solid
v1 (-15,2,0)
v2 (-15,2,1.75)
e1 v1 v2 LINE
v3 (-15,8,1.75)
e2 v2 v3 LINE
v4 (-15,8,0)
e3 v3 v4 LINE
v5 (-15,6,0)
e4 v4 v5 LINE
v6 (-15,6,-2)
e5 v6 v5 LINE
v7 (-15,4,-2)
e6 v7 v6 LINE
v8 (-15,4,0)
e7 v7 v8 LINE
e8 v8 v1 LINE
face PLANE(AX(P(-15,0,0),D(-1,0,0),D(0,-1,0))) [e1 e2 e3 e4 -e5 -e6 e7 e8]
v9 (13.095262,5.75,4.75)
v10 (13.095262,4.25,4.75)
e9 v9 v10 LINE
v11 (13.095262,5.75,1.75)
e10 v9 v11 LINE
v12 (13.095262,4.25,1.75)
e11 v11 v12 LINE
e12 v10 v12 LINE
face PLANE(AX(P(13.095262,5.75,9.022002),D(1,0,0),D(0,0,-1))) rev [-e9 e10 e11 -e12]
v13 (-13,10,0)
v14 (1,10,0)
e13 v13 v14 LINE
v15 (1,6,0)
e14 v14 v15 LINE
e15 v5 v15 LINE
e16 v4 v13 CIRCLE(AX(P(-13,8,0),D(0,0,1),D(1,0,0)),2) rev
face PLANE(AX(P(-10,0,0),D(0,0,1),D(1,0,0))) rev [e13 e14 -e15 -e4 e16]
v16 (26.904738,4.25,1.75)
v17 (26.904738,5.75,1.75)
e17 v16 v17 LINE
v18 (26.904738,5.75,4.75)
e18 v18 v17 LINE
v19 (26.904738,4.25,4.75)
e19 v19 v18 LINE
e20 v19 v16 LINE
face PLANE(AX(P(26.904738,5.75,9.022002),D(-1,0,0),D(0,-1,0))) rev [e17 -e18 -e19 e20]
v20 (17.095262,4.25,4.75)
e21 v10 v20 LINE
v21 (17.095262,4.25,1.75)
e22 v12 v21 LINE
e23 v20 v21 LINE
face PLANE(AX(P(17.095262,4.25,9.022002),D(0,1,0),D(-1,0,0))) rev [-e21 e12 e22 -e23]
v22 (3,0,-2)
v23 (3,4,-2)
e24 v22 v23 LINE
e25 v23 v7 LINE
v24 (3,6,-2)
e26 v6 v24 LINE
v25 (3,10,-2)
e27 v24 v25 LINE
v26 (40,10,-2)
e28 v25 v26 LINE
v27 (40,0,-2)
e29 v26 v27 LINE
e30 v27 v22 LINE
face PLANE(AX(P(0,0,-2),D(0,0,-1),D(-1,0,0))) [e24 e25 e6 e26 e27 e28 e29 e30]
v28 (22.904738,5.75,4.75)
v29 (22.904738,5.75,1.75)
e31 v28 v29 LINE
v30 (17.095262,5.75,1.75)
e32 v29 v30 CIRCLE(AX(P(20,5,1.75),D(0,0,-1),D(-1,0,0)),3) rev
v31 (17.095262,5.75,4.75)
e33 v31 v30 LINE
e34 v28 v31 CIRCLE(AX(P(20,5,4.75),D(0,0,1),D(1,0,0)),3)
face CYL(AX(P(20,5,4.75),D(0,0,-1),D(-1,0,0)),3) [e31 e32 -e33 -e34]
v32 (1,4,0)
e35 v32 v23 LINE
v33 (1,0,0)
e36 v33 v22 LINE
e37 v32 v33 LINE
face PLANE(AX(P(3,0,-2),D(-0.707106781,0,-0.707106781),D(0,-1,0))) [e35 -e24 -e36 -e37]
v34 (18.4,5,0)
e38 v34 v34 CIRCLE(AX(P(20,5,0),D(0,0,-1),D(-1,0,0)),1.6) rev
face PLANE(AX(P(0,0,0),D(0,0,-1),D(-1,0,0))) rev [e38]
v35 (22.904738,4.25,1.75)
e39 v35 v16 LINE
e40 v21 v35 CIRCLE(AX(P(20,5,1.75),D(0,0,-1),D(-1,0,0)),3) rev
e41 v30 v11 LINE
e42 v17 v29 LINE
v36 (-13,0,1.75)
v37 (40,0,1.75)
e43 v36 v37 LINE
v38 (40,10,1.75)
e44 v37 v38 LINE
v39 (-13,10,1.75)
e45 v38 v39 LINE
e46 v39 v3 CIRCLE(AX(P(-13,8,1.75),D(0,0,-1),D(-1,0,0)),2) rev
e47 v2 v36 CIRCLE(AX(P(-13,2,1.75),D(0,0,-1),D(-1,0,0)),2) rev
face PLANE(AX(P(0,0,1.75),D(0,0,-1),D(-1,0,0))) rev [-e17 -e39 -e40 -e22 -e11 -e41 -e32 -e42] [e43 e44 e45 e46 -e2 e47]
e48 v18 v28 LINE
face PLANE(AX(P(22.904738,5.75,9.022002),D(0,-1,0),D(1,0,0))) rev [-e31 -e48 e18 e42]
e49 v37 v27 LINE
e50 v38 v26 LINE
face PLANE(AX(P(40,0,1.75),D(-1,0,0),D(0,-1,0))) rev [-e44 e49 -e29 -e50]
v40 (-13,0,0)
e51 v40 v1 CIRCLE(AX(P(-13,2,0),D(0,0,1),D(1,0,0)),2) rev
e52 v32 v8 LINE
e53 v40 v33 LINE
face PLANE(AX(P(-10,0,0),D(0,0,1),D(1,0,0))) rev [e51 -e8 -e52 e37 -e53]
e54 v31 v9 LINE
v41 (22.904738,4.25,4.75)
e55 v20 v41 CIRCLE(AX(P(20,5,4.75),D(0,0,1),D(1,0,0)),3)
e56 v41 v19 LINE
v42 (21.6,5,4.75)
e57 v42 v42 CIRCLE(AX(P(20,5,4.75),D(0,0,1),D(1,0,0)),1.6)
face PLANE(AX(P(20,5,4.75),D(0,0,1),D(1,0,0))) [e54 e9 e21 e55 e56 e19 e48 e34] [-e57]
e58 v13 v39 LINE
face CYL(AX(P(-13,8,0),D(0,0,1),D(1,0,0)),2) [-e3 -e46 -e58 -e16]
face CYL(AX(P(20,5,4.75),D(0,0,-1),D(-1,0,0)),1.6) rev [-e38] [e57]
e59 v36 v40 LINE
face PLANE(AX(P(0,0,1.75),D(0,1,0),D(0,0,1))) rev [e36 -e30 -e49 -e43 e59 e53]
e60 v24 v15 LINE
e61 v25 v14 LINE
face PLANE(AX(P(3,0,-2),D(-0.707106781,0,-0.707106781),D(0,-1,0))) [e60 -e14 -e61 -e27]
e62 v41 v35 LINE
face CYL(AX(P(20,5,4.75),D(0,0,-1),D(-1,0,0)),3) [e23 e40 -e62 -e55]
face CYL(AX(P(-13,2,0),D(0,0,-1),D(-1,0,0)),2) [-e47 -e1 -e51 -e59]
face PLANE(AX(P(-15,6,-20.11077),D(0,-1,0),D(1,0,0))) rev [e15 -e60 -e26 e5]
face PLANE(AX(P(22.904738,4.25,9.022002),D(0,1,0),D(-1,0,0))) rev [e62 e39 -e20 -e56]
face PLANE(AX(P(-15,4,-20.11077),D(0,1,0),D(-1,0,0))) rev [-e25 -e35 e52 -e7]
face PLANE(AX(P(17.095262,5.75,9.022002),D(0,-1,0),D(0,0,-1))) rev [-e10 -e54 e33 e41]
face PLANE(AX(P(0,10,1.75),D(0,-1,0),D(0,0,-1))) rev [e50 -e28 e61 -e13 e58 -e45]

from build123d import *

# Parameters (mm, degrees)
SKETCH_1_W          = 40
SKETCH_1_H          = 10
EXTRUDE_1_DEPTH     = 1.75
SKETCH_3_W          = 4
SKETCH_3_H          = 10
EXTRUDE_3_DEPTH     = 2
SKETCH_4_W          = 15
SKETCH_4_H          = 1.5
SKETCH_4_W_2        = 3
SKETCH_4_H_2        = 3.5
EXTRUDE_4_DEPTH     = 2
CHAMFER_1_SIZE      = 1
SKETCH_6_R          = 3
SKETCH_6_R_2        = 1.6
EXTRUDE_5_DEPTH     = 3
SKETCH_7_W          = 1.75
SKETCH_7_H          = 10
EXTRUDE_6_DEPTH     = 10
SKETCH_8_W          = 4
SKETCH_8_H          = 1.5
EXTRUDE_7_DEPTH     = 3
SKETCH_9_W          = 33
SKETCH_9_H          = 10
EXTRUDE_8_DEPTH     = 2
CHAMFER_2_SIZE      = 3
SKETCH_10_W         = 1.75
SKETCH_10_H         = 10
EXTRUDE_9_DEPTH     = 5
FILLET_1_R          = 2
CUT_EXTRUDE_START   = -1.75
SKETCH_11_R         = 1.6
CUT_EXTRUDE_1_DEPTH = 1.75
SKETCH_12_W         = 18
SKETCH_12_H         = 2
EXTRUDE_10_DEPTH    = 2


# Some blends are built 0.0001 mm under size
with BuildPart() as part:
    # 草图1 → 凸台-拉伸1 (new body)
    with BuildSketch(Plane.XY):
        with Locations((20, 5)):
            Rectangle(SKETCH_1_W, SKETCH_1_H)
    extrude(amount=EXTRUDE_1_DEPTH)

    # 草图3 → 凸台-拉伸3 (add)
    with BuildSketch(Plane(origin=(0, 0, 0), x_dir=(-1, 0, 0), z_dir=(0, 0, -1))):
        with Locations((-38, 5)):
            Rectangle(SKETCH_3_W, SKETCH_3_H)
    extrude(amount=EXTRUDE_3_DEPTH)

    # 草图4 → 凸台-拉伸4 (add)
    with BuildSketch(Plane(origin=(0, 0, 0), x_dir=(-1, 0, 0), z_dir=(0, 0, -1))):
        with Locations((-28.5, 5.75)):
            Rectangle(SKETCH_4_W, SKETCH_4_H)
        with Locations((-28.5, 4.25)):
            Rectangle(SKETCH_4_W, SKETCH_4_H)
        with Locations((-19.5, 5.75)):
            Rectangle(SKETCH_4_W_2, SKETCH_4_H)
        with Locations((-19.5, 4.25)):
            Rectangle(SKETCH_4_W_2, SKETCH_4_H)
        with Locations((-19.5, 8.25)):
            Rectangle(SKETCH_4_W_2, SKETCH_4_H_2)
        with Locations((-19.5, 1.75)):
            Rectangle(SKETCH_4_W_2, SKETCH_4_H_2)
        with Locations((-10.5, 5.75)):
            Rectangle(SKETCH_4_W, SKETCH_4_H)
        with Locations((-10.5, 4.25)):
            Rectangle(SKETCH_4_W, SKETCH_4_H)
        with Locations((-1.5, 5.75)):
            Rectangle(SKETCH_4_W_2, SKETCH_4_H)
        with Locations((-1.5, 4.25)):
            Rectangle(SKETCH_4_W_2, SKETCH_4_H)
        with Locations((-1.5, 8.25)):
            Rectangle(SKETCH_4_W_2, SKETCH_4_H_2)
        with Locations((-1.5, 1.75)):
            Rectangle(SKETCH_4_W_2, SKETCH_4_H_2)
    extrude(amount=EXTRUDE_4_DEPTH)

    # 倒角1
    chamfer_1_edges = [part.edges().sort_by_distance(p)[0] for p in [
        (10.5, 3.5, 0),
        (28.5, 3.5, 0),
    ]]
    chamfer(chamfer_1_edges, length=CHAMFER_1_SIZE)
    chamfer_1_2_edges = [part.edges().sort_by_distance(p)[0] for p in [
        (10.5, 3.5, -2),
        (28.5, 3.5, -2),
    ]]
    chamfer(chamfer_1_2_edges, length=CHAMFER_1_SIZE - 0.0001)  # a hair under: the kernel refuses the full size

    # 草图6 → 凸台-拉伸5 (add)
    with BuildSketch(Plane.XY.offset(1.75)):
        with Locations(Location((20, 5, 0), (0, 0, 180))):
            Circle(SKETCH_6_R)
        with Locations((20, 5)):
            Circle(SKETCH_6_R_2, mode=Mode.SUBTRACT)
    extrude(amount=EXTRUDE_5_DEPTH)

    # 草图7 → 凸台-拉伸6 (add)
    with BuildSketch(Plane.ZY):
        with Locations((0.875, 5)):
            Rectangle(SKETCH_7_W, SKETCH_7_H)
    extrude(amount=EXTRUDE_6_DEPTH)

    # 草图8 → 凸台-拉伸7 (add)
    with BuildSketch(Plane.XY.offset(1.75)):
        with Locations((15.09526249, 5)):
            Rectangle(SKETCH_8_W, SKETCH_8_H)
        with Locations((24.90473751, 5)):
            Rectangle(SKETCH_8_W, SKETCH_8_H)
    extrude(amount=EXTRUDE_7_DEPTH)

    # 草图9 → 凸台-拉伸8 (add)
    with BuildSketch(Plane(origin=(0, 0, 0), x_dir=(-1, 0, 0), z_dir=(0, 0, -1))):
        with Locations((-19.5, 5)):
            Rectangle(SKETCH_9_W, SKETCH_9_H)
    extrude(amount=EXTRUDE_8_DEPTH)

    # 倒角2
    # the kernel refuses this chamfer: 3 mm, written as the material it takes off along each edge
    with BuildSketch(Plane(origin=(0, -7.715048964, -2), x_dir=(0.9996219169112968, 0, -0.027495876610586348), z_dir=(0, 1, 0))) as chamfer_2_piece_1_section:
        Polygon((CHAMFER_2_SIZE * 0.999621916911, -CHAMFER_2_SIZE * 0.0274958766106), (-CHAMFER_2_SIZE * 0.0274958766106, -CHAMFER_2_SIZE * 0.999621916911), (0, 0), align=None)
    chamfer_2_piece_1 = extrude(amount=25.430097928, mode=Mode.PRIVATE)
    chamfer_2_piece_1 = split(chamfer_2_piece_1, bisect_by=Plane(origin=(1.092091005, 5, 0), z_dir=(0, 0, -1)), keep=Keep.TOP, mode=Mode.PRIVATE)
    add(chamfer_2_piece_1, mode=Mode.SUBTRACT)

    # 草图10 → 凸台-拉伸9 (add)
    with BuildSketch(Plane.ZY.offset(10)):
        with Locations((0.875, 5)):
            Rectangle(SKETCH_10_W, SKETCH_10_H)
    extrude(amount=EXTRUDE_9_DEPTH)

    # 圆角1
    fillet_1_edges = [part.edges().sort_by_distance(p)[0] for p in [
        (-15, 10, 0.875),
        (-15, 0, 0.875),
    ]]
    fillet(fillet_1_edges, radius=FILLET_1_R)

    # 草图11 → 切除-拉伸1 (cut)
    with BuildSketch(Plane.XY.offset(1.75).offset(CUT_EXTRUDE_START)):
        with Locations(Location((20, 5, 0), (0, 0, 180))):
            Circle(SKETCH_11_R)
    extrude(amount=CUT_EXTRUDE_1_DEPTH, mode=Mode.SUBTRACT)

    # 草图12 → 凸台-拉伸10 (add)
    with BuildSketch(Plane(origin=(0, 0, 0), x_dir=(-1, 0, 0), z_dir=(0, 0, -1))):
        with Locations((6, 5)):
            Rectangle(SKETCH_12_W, SKETCH_12_H)
    extrude(amount=EXTRUDE_10_DEPTH)


solid = part.part
